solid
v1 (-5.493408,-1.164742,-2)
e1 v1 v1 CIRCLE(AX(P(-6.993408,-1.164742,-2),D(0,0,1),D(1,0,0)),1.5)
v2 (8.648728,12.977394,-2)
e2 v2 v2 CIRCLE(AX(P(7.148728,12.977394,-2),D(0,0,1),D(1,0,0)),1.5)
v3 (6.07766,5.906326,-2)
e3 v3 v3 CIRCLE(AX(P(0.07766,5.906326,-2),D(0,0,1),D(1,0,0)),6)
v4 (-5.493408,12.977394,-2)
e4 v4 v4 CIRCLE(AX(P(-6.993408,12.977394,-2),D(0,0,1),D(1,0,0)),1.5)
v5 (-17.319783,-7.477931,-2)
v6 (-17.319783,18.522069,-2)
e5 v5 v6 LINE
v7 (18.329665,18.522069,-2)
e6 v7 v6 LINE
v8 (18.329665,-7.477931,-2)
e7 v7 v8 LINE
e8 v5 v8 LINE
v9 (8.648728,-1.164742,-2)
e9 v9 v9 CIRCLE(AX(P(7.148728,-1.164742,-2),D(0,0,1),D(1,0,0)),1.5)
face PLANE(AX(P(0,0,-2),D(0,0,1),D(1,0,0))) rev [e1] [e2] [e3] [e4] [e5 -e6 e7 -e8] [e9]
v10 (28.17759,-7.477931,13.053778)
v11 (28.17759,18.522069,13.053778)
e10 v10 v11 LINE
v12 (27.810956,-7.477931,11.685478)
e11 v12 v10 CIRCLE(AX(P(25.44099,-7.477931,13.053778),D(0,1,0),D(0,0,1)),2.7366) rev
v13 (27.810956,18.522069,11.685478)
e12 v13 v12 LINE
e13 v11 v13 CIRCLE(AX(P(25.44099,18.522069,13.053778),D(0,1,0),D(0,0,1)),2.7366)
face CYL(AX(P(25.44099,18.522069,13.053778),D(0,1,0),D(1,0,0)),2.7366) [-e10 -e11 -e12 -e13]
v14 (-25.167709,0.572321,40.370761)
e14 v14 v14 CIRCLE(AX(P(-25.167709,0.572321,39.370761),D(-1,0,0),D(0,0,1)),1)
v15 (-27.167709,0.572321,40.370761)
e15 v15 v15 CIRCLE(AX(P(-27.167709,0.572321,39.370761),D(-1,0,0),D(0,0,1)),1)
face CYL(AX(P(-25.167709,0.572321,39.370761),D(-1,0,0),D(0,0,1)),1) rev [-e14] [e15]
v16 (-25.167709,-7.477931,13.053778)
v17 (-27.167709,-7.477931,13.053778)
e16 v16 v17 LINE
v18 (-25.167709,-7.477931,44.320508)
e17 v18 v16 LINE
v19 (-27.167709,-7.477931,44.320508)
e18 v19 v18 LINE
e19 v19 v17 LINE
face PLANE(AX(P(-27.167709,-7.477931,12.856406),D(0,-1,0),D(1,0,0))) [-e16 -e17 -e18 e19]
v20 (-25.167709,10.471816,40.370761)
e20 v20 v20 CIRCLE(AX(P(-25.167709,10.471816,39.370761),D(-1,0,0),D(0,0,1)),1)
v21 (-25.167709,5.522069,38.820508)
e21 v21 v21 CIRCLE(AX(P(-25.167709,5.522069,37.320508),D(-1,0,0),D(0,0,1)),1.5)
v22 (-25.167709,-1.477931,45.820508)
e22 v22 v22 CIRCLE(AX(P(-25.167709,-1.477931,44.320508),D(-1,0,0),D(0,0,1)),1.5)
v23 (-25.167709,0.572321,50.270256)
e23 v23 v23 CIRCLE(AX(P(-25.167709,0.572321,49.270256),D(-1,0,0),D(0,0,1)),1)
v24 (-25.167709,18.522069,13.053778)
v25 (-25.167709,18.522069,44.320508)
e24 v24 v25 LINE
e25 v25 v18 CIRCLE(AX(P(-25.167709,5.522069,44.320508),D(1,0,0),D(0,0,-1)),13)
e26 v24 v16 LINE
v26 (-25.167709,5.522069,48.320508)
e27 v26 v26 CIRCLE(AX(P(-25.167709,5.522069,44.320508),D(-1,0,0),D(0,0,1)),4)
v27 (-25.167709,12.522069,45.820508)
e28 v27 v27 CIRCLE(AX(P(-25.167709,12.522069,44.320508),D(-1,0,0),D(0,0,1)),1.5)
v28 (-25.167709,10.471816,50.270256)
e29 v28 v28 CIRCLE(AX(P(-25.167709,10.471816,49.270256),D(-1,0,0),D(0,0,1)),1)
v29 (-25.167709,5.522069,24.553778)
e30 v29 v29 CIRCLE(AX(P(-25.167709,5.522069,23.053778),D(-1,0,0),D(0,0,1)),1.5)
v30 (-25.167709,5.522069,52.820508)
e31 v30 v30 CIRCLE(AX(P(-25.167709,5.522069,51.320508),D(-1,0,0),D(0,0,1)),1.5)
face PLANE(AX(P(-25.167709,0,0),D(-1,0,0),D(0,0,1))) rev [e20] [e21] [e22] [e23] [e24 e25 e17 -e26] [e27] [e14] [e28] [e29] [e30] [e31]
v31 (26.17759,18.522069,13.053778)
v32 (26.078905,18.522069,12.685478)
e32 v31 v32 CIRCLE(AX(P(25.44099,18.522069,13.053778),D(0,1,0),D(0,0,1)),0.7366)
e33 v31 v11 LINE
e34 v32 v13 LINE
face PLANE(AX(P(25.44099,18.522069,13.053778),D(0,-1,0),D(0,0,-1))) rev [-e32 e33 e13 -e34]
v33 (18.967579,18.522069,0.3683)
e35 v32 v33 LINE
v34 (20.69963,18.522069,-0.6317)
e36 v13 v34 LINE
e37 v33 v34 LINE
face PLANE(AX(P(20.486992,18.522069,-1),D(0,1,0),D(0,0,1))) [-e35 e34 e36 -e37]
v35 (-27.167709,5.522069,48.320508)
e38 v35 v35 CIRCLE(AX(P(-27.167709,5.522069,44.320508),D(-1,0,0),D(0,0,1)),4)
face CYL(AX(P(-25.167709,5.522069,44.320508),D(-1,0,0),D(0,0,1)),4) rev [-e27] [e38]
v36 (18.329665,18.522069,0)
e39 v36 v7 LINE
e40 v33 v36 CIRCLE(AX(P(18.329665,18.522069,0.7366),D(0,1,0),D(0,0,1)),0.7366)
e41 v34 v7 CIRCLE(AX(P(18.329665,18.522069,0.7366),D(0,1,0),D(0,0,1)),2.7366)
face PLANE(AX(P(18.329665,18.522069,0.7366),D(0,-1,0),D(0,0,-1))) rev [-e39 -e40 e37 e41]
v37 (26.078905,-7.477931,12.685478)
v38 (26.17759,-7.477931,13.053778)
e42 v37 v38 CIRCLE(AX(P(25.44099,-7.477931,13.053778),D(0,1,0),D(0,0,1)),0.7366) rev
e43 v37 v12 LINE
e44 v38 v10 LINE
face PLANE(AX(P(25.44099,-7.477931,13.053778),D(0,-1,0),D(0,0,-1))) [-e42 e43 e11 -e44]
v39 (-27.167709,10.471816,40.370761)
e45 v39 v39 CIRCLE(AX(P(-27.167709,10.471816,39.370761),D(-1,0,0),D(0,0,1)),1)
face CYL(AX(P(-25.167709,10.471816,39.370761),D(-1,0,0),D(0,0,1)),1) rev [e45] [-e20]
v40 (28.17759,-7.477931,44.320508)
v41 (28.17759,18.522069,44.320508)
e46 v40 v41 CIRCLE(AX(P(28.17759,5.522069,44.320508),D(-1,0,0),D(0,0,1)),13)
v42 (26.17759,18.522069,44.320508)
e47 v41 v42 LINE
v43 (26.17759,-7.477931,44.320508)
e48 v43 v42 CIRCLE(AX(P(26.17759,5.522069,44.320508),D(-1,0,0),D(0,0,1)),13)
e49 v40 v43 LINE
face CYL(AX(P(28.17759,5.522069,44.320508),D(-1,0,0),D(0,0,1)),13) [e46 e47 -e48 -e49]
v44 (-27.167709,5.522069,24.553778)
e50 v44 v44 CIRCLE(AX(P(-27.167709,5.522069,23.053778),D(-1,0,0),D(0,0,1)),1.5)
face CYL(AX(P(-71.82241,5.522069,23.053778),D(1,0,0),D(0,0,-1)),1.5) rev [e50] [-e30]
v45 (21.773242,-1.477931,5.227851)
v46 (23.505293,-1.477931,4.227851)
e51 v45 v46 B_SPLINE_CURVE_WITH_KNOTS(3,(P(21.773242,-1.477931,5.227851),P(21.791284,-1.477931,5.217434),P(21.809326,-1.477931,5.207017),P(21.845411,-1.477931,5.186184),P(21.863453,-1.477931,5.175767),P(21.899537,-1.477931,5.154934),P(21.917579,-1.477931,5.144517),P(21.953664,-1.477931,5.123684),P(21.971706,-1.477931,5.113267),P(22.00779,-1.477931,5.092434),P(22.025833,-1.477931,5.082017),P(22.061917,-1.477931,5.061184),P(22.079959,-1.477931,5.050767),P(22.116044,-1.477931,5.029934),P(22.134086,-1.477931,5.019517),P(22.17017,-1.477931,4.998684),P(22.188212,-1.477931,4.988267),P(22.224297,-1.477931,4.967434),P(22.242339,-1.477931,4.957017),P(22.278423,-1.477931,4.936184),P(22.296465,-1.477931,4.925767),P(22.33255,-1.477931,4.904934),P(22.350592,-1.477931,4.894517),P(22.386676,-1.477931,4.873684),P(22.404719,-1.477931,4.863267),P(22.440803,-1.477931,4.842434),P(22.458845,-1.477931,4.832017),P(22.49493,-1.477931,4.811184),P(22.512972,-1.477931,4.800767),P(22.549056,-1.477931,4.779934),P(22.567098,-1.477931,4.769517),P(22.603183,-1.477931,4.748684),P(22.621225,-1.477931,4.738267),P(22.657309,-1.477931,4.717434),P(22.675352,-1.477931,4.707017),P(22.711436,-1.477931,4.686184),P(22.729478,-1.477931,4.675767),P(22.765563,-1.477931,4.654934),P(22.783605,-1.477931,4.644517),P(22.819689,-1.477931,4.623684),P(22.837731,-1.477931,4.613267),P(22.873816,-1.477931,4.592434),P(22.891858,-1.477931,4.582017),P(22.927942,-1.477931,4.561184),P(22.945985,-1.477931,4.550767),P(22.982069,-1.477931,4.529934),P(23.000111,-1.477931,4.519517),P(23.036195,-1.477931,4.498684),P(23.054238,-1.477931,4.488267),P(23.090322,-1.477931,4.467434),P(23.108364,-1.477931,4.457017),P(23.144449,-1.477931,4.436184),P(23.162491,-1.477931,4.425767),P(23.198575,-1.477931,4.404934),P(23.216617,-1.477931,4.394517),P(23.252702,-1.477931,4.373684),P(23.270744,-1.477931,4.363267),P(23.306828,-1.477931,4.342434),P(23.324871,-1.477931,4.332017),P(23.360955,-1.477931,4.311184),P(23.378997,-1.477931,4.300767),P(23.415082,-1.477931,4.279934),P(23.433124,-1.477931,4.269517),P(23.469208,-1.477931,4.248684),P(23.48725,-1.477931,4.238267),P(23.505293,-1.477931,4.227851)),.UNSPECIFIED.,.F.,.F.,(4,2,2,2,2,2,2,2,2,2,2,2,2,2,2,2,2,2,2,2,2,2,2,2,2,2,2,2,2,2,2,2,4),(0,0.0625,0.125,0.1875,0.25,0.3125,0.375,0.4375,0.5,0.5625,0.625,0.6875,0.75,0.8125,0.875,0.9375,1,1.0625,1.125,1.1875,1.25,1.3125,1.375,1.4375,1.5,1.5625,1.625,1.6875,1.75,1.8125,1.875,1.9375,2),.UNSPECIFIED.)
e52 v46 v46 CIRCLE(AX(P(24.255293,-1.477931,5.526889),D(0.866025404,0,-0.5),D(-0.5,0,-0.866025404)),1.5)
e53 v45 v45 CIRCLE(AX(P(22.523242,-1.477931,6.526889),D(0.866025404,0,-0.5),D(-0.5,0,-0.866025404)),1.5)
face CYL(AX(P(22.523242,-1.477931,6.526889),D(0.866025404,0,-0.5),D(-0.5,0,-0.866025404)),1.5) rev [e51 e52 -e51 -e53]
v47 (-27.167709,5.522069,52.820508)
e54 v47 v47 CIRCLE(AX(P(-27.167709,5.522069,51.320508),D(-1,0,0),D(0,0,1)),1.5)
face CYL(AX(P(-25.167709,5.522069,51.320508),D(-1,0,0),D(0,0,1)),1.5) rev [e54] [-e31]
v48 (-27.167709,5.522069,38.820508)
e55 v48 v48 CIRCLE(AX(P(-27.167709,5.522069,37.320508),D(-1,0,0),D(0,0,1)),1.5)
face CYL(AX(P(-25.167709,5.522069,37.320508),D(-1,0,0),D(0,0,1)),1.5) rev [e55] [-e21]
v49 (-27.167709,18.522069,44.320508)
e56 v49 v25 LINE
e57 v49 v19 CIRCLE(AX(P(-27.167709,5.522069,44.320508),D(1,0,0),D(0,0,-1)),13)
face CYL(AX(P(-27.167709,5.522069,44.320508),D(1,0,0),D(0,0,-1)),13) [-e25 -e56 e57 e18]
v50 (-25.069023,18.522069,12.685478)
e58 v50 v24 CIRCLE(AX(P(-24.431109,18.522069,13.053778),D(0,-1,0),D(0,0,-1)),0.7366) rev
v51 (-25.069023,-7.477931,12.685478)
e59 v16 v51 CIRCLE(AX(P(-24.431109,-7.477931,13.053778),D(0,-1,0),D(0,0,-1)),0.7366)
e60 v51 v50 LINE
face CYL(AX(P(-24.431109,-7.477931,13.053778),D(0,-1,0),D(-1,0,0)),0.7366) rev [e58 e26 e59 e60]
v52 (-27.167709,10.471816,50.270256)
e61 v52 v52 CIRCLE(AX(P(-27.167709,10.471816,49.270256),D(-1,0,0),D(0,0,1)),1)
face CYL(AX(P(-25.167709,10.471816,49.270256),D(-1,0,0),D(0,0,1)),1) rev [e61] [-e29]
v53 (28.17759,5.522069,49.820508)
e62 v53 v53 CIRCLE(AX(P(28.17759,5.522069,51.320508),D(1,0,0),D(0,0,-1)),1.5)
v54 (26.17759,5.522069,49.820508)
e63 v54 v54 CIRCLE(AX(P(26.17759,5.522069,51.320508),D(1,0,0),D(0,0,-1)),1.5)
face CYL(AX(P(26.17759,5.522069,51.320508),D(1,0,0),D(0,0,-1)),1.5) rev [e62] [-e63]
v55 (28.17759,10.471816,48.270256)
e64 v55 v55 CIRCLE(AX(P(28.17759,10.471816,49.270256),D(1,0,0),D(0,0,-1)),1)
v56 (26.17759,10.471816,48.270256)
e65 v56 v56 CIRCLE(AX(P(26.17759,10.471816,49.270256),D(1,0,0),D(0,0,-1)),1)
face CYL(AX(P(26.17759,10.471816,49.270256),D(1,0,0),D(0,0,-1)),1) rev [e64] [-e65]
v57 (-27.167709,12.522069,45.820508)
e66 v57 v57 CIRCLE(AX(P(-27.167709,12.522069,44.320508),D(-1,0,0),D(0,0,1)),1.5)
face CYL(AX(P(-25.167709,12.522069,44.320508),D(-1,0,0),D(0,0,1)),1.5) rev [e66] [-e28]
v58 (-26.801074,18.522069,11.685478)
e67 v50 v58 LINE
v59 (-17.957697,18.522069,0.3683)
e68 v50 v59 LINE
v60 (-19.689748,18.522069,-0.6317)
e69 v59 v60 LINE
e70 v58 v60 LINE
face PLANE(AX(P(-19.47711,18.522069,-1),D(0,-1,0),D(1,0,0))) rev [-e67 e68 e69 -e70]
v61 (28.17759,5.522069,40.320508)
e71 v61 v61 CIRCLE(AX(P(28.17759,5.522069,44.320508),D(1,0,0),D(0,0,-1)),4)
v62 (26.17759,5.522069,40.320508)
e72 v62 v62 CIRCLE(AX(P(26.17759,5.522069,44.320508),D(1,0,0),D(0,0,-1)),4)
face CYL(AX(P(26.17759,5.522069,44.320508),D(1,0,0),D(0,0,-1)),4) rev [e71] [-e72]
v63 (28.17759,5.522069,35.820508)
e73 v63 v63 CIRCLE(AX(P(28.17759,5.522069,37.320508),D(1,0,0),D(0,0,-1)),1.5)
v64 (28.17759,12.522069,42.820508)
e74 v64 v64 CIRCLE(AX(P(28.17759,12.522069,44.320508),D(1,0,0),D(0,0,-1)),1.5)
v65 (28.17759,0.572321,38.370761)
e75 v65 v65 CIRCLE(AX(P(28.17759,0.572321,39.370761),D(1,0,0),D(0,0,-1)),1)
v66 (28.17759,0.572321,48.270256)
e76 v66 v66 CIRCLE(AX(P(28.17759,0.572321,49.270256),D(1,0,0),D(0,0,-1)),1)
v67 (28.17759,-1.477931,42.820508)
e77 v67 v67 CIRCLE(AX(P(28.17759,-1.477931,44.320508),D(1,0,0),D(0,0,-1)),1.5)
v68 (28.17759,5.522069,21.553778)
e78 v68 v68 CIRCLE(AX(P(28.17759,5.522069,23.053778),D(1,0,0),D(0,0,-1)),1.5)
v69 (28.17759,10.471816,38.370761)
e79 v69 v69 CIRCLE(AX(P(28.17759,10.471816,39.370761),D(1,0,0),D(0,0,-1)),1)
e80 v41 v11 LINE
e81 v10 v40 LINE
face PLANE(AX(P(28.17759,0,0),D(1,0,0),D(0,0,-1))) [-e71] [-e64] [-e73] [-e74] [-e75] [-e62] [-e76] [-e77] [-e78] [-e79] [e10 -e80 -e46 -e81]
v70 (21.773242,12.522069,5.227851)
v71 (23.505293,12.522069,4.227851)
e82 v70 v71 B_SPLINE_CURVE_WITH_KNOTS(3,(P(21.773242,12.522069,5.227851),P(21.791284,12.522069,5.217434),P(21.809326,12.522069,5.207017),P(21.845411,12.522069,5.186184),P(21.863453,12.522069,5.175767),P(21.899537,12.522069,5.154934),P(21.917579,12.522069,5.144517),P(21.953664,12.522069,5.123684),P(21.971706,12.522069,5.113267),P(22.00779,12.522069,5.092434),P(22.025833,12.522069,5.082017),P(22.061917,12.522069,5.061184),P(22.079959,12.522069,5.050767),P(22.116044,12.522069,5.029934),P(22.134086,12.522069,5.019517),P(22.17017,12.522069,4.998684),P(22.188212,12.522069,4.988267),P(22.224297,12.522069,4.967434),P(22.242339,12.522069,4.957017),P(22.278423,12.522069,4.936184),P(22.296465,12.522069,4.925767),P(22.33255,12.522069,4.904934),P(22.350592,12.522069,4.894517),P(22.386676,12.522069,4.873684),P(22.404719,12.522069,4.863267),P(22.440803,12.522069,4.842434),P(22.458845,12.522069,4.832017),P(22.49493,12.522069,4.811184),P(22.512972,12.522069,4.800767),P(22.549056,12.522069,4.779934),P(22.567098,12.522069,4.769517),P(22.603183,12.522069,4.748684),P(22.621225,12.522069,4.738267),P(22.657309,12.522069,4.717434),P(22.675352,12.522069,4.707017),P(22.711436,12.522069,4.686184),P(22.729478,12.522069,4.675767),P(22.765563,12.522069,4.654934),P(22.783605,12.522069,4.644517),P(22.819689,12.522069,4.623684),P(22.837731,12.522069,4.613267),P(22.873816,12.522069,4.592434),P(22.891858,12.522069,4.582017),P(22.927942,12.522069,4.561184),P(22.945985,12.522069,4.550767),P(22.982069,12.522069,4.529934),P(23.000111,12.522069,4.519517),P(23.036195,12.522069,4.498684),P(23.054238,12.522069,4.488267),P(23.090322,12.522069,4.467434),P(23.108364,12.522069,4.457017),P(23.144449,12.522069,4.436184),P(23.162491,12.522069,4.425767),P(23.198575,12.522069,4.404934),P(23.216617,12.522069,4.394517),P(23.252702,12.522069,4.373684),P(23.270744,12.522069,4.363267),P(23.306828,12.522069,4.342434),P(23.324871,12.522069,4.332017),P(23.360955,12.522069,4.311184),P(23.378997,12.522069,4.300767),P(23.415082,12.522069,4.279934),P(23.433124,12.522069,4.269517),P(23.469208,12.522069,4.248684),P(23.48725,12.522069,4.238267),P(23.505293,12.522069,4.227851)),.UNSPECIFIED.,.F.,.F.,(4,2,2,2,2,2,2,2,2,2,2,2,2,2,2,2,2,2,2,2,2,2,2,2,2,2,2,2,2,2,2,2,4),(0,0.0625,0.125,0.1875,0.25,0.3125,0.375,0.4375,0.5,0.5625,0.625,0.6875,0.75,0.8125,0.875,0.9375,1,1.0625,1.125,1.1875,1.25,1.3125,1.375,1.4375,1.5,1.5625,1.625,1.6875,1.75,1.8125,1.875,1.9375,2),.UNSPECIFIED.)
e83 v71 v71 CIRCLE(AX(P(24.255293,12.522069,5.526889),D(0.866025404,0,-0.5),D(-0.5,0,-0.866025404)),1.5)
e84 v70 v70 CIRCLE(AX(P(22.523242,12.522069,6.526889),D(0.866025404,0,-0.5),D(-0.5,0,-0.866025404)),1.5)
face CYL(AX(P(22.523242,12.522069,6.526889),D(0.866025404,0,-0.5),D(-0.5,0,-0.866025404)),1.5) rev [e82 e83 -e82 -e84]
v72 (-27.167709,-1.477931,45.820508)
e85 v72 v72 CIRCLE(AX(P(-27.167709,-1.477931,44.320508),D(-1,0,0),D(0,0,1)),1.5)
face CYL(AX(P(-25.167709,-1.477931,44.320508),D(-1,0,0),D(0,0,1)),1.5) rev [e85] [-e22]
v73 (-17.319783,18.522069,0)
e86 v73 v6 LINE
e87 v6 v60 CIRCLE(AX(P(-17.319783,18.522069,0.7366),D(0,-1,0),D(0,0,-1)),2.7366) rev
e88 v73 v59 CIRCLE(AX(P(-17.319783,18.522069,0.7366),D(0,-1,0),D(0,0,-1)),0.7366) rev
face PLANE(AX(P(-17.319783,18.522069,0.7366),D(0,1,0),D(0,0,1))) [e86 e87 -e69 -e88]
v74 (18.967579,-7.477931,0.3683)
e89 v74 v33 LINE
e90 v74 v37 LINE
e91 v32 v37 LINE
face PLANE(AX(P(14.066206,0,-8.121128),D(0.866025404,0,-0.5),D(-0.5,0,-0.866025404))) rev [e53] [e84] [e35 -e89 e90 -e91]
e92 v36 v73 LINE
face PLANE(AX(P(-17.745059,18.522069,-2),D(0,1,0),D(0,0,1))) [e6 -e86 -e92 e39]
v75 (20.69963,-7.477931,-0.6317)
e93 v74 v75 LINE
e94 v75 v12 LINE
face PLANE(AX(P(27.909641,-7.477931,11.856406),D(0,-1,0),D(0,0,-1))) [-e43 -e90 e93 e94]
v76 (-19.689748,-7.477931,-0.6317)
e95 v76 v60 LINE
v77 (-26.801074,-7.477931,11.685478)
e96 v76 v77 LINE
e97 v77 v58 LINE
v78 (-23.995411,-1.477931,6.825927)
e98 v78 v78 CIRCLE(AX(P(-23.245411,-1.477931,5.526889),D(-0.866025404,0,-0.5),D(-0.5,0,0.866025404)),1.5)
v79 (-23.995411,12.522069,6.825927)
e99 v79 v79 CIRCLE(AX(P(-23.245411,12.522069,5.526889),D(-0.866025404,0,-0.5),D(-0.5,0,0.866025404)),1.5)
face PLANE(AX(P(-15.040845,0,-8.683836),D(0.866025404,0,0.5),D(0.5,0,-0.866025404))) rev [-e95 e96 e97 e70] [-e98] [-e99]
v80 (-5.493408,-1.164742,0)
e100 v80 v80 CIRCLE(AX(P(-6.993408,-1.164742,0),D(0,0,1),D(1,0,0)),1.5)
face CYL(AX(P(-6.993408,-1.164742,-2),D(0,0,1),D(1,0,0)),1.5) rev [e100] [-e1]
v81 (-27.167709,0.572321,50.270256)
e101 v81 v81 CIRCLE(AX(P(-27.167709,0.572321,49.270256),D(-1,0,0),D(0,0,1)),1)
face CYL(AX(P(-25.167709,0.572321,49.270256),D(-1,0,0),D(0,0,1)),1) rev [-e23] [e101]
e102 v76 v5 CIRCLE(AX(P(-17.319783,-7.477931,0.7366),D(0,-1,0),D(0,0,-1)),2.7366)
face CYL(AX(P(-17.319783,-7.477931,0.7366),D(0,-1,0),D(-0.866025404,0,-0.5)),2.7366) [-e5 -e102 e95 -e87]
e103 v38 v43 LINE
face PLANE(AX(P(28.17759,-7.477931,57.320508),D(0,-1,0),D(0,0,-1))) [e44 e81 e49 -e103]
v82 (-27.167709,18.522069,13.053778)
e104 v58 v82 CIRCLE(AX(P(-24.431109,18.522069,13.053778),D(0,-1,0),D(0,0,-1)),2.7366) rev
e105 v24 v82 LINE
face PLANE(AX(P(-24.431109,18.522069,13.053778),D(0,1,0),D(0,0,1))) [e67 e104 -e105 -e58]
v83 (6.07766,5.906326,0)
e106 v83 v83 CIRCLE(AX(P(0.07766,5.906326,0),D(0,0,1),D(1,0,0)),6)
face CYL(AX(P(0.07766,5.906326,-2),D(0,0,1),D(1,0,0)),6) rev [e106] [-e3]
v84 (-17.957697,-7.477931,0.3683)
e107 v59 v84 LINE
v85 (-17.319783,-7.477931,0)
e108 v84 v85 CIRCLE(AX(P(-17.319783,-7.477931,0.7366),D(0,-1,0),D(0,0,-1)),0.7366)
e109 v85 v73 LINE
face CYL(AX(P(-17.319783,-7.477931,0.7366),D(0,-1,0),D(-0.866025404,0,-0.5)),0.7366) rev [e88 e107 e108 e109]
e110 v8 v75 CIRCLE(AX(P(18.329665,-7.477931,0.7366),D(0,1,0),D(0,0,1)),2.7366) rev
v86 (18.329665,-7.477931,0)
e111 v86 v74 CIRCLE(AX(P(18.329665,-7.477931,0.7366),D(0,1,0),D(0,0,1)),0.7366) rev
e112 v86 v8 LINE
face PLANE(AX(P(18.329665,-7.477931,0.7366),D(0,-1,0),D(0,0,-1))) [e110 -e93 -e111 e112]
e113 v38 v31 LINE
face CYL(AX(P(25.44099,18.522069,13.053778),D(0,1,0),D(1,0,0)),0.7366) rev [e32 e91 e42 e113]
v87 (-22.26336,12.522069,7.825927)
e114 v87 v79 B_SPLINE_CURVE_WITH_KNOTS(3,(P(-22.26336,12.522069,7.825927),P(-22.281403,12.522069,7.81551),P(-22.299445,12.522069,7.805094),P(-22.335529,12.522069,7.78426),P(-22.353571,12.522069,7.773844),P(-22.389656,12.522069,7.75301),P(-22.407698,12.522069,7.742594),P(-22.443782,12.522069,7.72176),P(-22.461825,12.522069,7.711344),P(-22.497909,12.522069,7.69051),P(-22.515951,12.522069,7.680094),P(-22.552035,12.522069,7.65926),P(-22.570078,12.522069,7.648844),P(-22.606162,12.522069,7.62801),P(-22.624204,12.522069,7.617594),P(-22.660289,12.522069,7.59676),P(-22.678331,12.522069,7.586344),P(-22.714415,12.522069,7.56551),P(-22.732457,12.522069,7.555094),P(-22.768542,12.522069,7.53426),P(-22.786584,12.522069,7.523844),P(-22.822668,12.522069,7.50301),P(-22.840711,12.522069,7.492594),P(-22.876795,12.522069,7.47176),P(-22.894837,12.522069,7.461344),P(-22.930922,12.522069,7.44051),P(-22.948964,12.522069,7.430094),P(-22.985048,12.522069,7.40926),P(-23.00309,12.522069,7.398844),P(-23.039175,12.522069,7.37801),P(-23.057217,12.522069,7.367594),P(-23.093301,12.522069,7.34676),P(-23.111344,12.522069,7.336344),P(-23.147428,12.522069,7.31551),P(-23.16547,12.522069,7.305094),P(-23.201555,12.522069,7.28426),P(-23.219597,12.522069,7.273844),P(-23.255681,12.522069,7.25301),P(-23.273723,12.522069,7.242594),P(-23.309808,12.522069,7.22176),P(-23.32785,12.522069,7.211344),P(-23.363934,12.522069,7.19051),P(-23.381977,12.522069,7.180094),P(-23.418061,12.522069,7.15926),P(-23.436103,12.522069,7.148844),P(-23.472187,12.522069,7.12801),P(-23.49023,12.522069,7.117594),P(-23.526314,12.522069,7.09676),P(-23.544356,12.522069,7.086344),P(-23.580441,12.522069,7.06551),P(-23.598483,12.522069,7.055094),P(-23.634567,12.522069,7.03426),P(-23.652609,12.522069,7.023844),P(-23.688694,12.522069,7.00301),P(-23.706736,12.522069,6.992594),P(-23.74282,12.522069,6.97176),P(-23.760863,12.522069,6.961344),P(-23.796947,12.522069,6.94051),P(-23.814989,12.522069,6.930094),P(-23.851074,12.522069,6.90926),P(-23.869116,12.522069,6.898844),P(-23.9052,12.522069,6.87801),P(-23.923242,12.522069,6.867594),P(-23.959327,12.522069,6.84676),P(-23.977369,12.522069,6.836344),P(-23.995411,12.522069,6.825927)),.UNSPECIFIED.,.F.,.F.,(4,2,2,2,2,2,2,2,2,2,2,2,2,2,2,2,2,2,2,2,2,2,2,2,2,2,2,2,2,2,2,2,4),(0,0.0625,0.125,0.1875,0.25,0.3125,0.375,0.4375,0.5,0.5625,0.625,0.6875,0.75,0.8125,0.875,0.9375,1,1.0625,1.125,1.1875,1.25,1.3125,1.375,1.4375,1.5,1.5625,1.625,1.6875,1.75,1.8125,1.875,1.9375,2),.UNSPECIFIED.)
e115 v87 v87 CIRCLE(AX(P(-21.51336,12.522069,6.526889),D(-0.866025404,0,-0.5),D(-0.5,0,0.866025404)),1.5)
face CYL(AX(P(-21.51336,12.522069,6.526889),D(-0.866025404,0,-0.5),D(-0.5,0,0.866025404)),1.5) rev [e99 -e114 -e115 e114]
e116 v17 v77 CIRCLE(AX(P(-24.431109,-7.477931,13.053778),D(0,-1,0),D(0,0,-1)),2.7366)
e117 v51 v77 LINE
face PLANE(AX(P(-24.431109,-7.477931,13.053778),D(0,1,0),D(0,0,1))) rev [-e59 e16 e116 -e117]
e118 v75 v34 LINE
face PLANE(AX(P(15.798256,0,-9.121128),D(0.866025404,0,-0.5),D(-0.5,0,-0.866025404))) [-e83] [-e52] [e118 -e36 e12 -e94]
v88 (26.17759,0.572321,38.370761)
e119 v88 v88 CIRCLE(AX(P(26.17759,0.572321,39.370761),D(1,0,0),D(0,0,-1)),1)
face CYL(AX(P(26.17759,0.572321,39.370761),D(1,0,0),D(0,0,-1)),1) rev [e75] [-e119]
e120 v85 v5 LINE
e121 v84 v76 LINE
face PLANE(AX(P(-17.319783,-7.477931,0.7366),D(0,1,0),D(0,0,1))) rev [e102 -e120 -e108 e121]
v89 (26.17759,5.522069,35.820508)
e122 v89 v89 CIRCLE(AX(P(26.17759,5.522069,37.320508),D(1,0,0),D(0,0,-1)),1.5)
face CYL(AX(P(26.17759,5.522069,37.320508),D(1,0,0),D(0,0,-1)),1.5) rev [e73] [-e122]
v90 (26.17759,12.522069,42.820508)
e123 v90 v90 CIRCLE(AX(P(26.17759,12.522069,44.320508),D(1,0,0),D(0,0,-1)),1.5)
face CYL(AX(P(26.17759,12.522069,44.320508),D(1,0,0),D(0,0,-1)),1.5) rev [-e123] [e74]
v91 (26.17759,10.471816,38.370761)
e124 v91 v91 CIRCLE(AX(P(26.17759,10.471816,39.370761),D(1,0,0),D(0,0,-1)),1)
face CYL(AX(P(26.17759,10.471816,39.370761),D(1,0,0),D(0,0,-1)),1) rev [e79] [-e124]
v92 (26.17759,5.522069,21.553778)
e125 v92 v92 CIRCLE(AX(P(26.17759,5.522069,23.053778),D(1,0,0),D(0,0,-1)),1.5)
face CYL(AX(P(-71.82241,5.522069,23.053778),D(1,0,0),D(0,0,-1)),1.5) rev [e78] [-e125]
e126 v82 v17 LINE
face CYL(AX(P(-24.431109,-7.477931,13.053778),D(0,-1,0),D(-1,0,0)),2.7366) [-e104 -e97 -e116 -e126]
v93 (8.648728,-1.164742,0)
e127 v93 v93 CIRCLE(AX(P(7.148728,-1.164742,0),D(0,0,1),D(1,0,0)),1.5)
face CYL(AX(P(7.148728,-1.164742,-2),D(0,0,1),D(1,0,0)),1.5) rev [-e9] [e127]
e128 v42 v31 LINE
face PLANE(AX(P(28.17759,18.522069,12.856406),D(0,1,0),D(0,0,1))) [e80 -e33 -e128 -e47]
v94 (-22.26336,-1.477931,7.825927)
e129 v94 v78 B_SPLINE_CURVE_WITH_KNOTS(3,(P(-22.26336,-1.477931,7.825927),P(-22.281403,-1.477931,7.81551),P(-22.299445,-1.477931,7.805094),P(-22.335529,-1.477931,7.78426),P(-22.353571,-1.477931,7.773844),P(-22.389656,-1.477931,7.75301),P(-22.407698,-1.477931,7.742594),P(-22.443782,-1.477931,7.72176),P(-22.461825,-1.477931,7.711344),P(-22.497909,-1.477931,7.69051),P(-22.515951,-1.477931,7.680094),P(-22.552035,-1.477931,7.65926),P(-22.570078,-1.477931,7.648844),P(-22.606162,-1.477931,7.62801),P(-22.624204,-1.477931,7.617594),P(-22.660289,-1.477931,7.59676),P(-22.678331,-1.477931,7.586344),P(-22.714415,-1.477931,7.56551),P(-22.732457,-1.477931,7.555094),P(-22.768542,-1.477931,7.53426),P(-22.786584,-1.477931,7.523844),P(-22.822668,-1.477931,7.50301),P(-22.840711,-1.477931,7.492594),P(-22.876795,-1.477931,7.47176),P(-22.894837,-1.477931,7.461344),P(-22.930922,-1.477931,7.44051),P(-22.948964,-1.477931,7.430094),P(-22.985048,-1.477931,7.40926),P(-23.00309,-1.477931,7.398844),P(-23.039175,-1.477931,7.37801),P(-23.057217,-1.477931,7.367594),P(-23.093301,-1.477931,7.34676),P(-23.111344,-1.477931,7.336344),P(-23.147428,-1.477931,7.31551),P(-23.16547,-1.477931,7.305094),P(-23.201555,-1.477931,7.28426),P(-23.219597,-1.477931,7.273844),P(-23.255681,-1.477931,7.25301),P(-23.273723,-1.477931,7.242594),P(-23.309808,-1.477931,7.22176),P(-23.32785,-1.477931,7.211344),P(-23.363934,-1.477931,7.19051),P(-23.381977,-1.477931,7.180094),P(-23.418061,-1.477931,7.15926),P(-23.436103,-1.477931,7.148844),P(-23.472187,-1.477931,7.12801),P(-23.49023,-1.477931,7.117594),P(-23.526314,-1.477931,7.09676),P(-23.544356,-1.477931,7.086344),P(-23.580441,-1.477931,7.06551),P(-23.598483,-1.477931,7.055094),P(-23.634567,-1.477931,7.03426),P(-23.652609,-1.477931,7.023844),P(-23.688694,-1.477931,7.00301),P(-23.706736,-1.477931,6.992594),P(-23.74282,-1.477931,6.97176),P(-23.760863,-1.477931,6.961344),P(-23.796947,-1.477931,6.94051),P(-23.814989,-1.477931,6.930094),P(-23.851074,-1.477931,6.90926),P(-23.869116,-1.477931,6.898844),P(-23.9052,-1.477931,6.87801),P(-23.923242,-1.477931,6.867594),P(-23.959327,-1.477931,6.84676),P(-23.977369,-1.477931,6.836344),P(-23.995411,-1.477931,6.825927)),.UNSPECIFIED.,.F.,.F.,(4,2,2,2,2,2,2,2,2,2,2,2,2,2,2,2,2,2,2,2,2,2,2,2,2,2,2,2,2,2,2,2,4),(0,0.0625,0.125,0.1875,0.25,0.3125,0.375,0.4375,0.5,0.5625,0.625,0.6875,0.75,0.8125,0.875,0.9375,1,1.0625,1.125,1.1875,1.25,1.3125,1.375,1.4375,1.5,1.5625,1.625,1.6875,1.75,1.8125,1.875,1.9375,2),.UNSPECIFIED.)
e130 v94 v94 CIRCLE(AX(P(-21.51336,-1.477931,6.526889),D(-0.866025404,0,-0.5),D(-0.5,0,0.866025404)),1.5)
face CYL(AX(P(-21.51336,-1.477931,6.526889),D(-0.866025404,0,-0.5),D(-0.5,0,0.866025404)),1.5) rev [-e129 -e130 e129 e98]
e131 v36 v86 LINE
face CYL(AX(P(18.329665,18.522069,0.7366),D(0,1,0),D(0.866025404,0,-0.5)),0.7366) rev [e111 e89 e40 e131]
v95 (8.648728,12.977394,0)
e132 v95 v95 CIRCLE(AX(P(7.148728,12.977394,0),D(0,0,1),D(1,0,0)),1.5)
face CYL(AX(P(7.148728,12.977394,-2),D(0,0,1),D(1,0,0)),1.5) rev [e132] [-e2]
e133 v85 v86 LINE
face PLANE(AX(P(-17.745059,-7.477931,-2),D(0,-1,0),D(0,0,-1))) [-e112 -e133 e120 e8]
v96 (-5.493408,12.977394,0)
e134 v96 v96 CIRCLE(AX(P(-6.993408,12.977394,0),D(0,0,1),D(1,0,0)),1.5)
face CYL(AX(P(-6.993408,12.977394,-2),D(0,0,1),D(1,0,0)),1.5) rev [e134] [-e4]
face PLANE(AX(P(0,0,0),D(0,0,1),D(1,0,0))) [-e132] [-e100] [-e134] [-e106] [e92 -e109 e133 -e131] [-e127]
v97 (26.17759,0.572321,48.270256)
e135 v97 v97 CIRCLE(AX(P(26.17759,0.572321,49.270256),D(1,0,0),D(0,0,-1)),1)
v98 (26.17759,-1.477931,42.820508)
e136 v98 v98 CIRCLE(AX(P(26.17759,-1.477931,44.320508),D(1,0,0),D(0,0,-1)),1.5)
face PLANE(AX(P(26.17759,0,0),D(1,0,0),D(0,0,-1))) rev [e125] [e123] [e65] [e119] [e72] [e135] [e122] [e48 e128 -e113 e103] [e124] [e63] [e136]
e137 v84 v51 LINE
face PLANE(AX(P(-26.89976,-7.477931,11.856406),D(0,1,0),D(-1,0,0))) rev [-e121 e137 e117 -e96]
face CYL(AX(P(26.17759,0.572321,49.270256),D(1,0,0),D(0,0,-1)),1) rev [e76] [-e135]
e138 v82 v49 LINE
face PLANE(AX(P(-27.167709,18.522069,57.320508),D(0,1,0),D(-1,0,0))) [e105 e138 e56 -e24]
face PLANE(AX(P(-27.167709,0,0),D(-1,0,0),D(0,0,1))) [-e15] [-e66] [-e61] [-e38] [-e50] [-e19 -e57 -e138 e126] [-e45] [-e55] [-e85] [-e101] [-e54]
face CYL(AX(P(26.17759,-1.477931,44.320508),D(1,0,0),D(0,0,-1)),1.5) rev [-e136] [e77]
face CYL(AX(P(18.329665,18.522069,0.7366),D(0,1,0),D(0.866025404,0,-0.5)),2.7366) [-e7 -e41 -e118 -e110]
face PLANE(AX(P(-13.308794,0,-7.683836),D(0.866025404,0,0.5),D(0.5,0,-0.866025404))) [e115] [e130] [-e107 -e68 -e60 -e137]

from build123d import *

# Parameters (mm, degrees)
SKETCH_1_W                       = 36.5
SKETCH_1_H                       = 26
SM_BASE_FLANGE_1_DEPTH           = 2
SM_EDGE_FLANGE_1_STRIP_CUT_DEPTH = 26
SM_EDGE_FLANGE_1_DEPTH           = 26
SM_EDGE_FLANGE_2_STRIP_CUT_DEPTH = 26
SM_EDGE_FLANGE_2_DEPTH           = 26
SM_EDGE_FLANGE_3_STRIP_CUT_DEPTH = 26
SM_EDGE_FLANGE_3_DEPTH           = 26
SM_EDGE_FLANGE_4_STRIP_CUT_DEPTH = 26
SM_EDGE_FLANGE_4_DEPTH           = 26
CUT_EXTRUDE_1_DEPTH              = 2
CUT_EXTRUDE_START                = -2
CUT_EXTRUDE_2_DEPTH              = 2
SKETCH_28_R                      = 6
SKETCH_28_R_2                    = 1.5
CUT_EXTRUDE_3_DEPTH              = 2
SKETCH_33_R                      = 4
SKETCH_33_R_2                    = 1
SKETCH_33_R_3                    = 1.5
CUT_EXTRUDE_4_DEPTH              = 2
SKETCH_34_R                      = 1
SKETCH_34_R_2                    = 1.5
SKETCH_34_R_3                    = 4
CUT_EXTRUDE_5_DEPTH              = 2
SKETCH_35_R                      = 1.5
CUT_EXTRUDE_6_DEPTH              = 2
SKETCH_36_R                      = 1.5
CUT_EXTRUDE_7_DEPTH              = 2
SKETCH_37_R                      = 1.5
CUT_EXTRUDE_8_DEPTH              = 100


# Sheet-metal steps are written as plain solids
with BuildPart() as part:
    # Sketch 1 → 基体-法兰1 (new body)
    with BuildSketch(Plane.XY):
        with Locations((0.504940711, 5.522068511)):
            Rectangle(SKETCH_1_W, SKETCH_1_H)
    extrude(amount=-SM_BASE_FLANGE_1_DEPTH)

    # 边线-法兰1 strip (across the edge) → 边线-法兰1 strip cut (cut)
    with BuildSketch(Plane(origin=(18.754940711, -7.477931489, 0), x_dir=(-0.8660254037844364, 0, 0.5000000000000041), z_dir=(0, 1, 0))):
        Polygon((-8.835731855, 2.791911088), (-0.6317, -1.944688912), (0.3683, -0.212638104), (-7.835731855, 4.523961896), align=None)
    extrude(amount=SM_EDGE_FLANGE_1_STRIP_CUT_DEPTH, mode=Mode.SUBTRACT)

    # 边线-法兰1 section (across the edge) → 边线-法兰1 (add)
    with BuildSketch(Plane(origin=(18.754940711, -7.477931489, 0), x_dir=(-0.8660254037844364, 0, 0.5000000000000041), z_dir=(0, 1, 0))):
        with BuildLine():
            Line((-2, 0.425276208), (-2, 14.845299462))
            Line((-2, 14.845299462), (0, 14.845299462))
            Line((0, 14.845299462), (0, 0.425276208))
            ThreePointArc((0, 0.425276208), (0.098685688, 0.056976208), (0.3683, -0.212638104))
            Line((0.3683, -0.212638104), (-0.6317, -1.944688912))
            ThreePointArc((-0.6317, -1.944688912), (-1.63336512, -0.943023792), (-2, 0.425276208))
        make_face()
    extrude(amount=SM_EDGE_FLANGE_1_DEPTH)

    # 边线-法兰2 strip (across the edge) → 边线-法兰2 strip cut (cut)
    with BuildSketch(Plane(origin=(26.177590442, -7.477931489, 12.856406461), x_dir=(-1, 0, 0), z_dir=(0, 1, 0))):
        Polygon((-6.36996512, 7.03310323), (-1.63336512, -1.170928625), (0.098685688, -0.170928625), (-4.637914312, 8.03310323), align=None)
    extrude(amount=SM_EDGE_FLANGE_2_STRIP_CUT_DEPTH, mode=Mode.SUBTRACT)

    # 边线-法兰2 section (across the edge) → 边线-法兰2 (add)
    with BuildSketch(Plane(origin=(26.177590442, -7.477931489, 12.856406461), x_dir=(-1, 0, 0), z_dir=(0, 1, 0))):
        with BuildLine():
            Line((-2, 0.197371375), (-2, 44.464101615))
            Line((-2, 44.464101615), (0, 44.464101615))
            Line((0, 44.464101615), (0, 0.197371375))
            ThreePointArc((0, 0.197371375), (0.025099036, 0.006725267), (0.098685688, -0.170928625))
            Line((0.098685688, -0.170928625), (-1.63336512, -1.170928625))
            ThreePointArc((-1.63336512, -1.170928625), (-1.906752616, -0.510912824), (-2, 0.197371375))
        make_face()
    extrude(amount=SM_EDGE_FLANGE_2_DEPTH)

    # 边线-法兰3 strip (across the edge) → 边线-法兰3 strip cut (cut)
    with BuildSketch(Plane(origin=(-17.745059289, 18.522068511, 0), x_dir=(0.8660254037844365, 0, 0.500000000000004), z_dir=(0, -1, 0))):
        Polygon((-8.835731855, 2.791911088), (-0.6317, -1.944688912), (0.3683, -0.212638104), (-7.835731855, 4.523961896), align=None)
    extrude(amount=SM_EDGE_FLANGE_3_STRIP_CUT_DEPTH, mode=Mode.SUBTRACT)

    # 边线-法兰3 section (across the edge) → 边线-法兰3 (add)
    with BuildSketch(Plane(origin=(-17.745059289, 18.522068511, 0), x_dir=(0.8660254037844365, 0, 0.500000000000004), z_dir=(0, -1, 0))):
        with BuildLine():
            Line((-2, 0.425276208), (-2, 14.845299462))
            Line((-2, 14.845299462), (0, 14.845299462))
            Line((0, 14.845299462), (0, 0.425276208))
            ThreePointArc((0, 0.425276208), (0.098685688, 0.056976208), (0.3683, -0.212638104))
            Line((0.3683, -0.212638104), (-0.6317, -1.944688912))
            ThreePointArc((-0.6317, -1.944688912), (-1.63336512, -0.943023792), (-2, 0.425276208))
        make_face()
    extrude(amount=SM_EDGE_FLANGE_3_DEPTH)

    # 边线-法兰4 strip (across the edge) → 边线-法兰4 strip cut (cut)
    with BuildSketch(Plane(origin=(-25.167709019, 18.522068511, 12.856406461), x_dir=(1, 0, 0), z_dir=(0, -1, 0))):
        Polygon((-6.36996512, 7.03310323), (-1.63336512, -1.170928625), (0.098685688, -0.170928625), (-4.637914312, 8.03310323), align=None)
    extrude(amount=SM_EDGE_FLANGE_4_STRIP_CUT_DEPTH, mode=Mode.SUBTRACT)

    # 边线-法兰4 section (across the edge) → 边线-法兰4 (add)
    with BuildSketch(Plane(origin=(-25.167709019, 18.522068511, 12.856406461), x_dir=(1, 0, 0), z_dir=(0, -1, 0))):
        with BuildLine():
            Line((-2, 0.197371375), (-2, 44.464101615))
            Line((-2, 44.464101615), (0, 44.464101615))
            Line((0, 44.464101615), (0, 0.197371375))
            ThreePointArc((0, 0.197371375), (0.025099036, 0.006725267), (0.098685688, -0.170928625))
            Line((0.098685688, -0.170928625), (-1.63336512, -1.170928625))
            ThreePointArc((-1.63336512, -1.170928625), (-1.906752616, -0.510912824), (-2, 0.197371375))
        make_face()
    extrude(amount=SM_EDGE_FLANGE_4_DEPTH)

    # 草图20 → 切除-拉伸1 (cut)
    with BuildSketch(Plane.ZY.offset(-26.177590442)):
        with BuildLine():
            ThreePointArc((44.320508076, 18.522068511), (53.512896231, 14.714456667), (57.320508076, 5.522068511))
            Line((57.320508076, 5.522068511), (57.320508076, 18.522068511))
            Line((57.320508076, 18.522068511), (44.320508076, 18.522068511))
        make_face()
        with BuildLine():
            Line((57.320508076, -7.477931489), (57.320508076, 5.522068511))
            ThreePointArc((57.320508076, 5.522068511), (53.512896231, -3.670319644), (44.320508076, -7.477931489))
            Line((44.320508076, -7.477931489), (57.320508076, -7.477931489))
        make_face()
    extrude(amount=-CUT_EXTRUDE_1_DEPTH, mode=Mode.SUBTRACT)

    # 草图21 → 切除-拉伸2 (cut)
    with BuildSketch(Plane(origin=(-25.167709019, 0, 0), x_dir=(0, 0, -1), z_dir=(1, 0, 0)).offset(CUT_EXTRUDE_START)):
        with BuildLine():
            Line((-57.320508076, -7.477931489), (-44.320508076, -7.477931489))
            ThreePointArc((-44.320508076, -7.477931489), (-53.512896231, -3.670319644), (-57.320508076, 5.522068511))
            Line((-57.320508076, 5.522068511), (-57.320508076, -7.477931489))
        make_face()
        with BuildLine():
            ThreePointArc((-57.320508076, 5.522068511), (-53.512896231, 14.714456667), (-44.320508076, 18.522068511))
            Line((-44.320508076, 18.522068511), (-57.320508076, 18.522068511))
            Line((-57.320508076, 18.522068511), (-57.320508076, 5.522068511))
        make_face()
    extrude(amount=CUT_EXTRUDE_2_DEPTH, mode=Mode.SUBTRACT)

    # 草图28 → 切除-拉伸3 (cut)
    with BuildSketch(Plane.XY):
        with Locations((0.077660184, 5.906325961)):
            Circle(SKETCH_28_R)
        with Locations((7.148727996, 12.977393772)):
            Circle(SKETCH_28_R_2)
        with Locations((-6.993407628, -1.164741851)):
            Circle(SKETCH_28_R_2)
        with Locations((-6.993407628, 12.977393772)):
            Circle(SKETCH_28_R_2)
        with Locations((7.148727996, -1.164741851)):
            Circle(SKETCH_28_R_2)
    extrude(amount=-CUT_EXTRUDE_3_DEPTH, mode=Mode.SUBTRACT)

    # 草图33 → 切除-拉伸4 (cut)
    with BuildSketch(Plane(origin=(28.177590442, 0, 0), x_dir=(0, 0, -1), z_dir=(1, 0, 0))):
        with Locations((-44.320508076, 5.522068511)):
            Circle(SKETCH_33_R)
        with Locations((-39.370760607, 10.47181598)):
            Circle(SKETCH_33_R_2)
        with Locations((-39.370760607, 0.572321043)):
            Circle(SKETCH_33_R_2)
        with Locations((-49.270255544, 0.572321043)):
            Circle(SKETCH_33_R_2)
        with Locations((-49.270255544, 10.47181598)):
            Circle(SKETCH_33_R_2)
        with Locations((-44.320508076, 12.522068511)):
            Circle(SKETCH_33_R_3)
        with Locations((-37.320508076, 5.522068511)):
            Circle(SKETCH_33_R_3)
        with Locations((-44.320508076, -1.477931489)):
            Circle(SKETCH_33_R_3)
        with Locations((-51.320508076, 5.522068511)):
            Circle(SKETCH_33_R_3)
    extrude(amount=-CUT_EXTRUDE_4_DEPTH, mode=Mode.SUBTRACT)

    # 草图34 → 切除-拉伸5 (cut)
    with BuildSketch(Plane.ZY.offset(27.167709019).offset(CUT_EXTRUDE_START)):
        with Locations(Location((49.270255544, 10.47181598, 0), (0, 0, 180))):
            Circle(SKETCH_34_R)
        with Locations(Location((51.320508076, 5.522068511, 0), (0, 0, 180))):
            Circle(SKETCH_34_R_2)
        with Locations(Location((49.270255544, 0.572321043, 0), (0, 0, 180))):
            Circle(SKETCH_34_R)
        with Locations(Location((44.320508076, -1.477931489, 0), (0, 0, 180))):
            Circle(SKETCH_34_R_2)
        with Locations(Location((39.370760607, 0.572321043, 0), (0, 0, 180))):
            Circle(SKETCH_34_R)
        with Locations(Location((37.320508076, 5.522068511, 0), (0, 0, 180))):
            Circle(SKETCH_34_R_2)
        with Locations(Location((39.370760607, 10.47181598, 0), (0, 0, 180))):
            Circle(SKETCH_34_R)
        with Locations(Location((44.320508076, 12.522068511, 0), (0, 0, 180))):
            Circle(SKETCH_34_R_2)
        with Locations(Location((44.320508076, 5.522068511, 0), (0, 0, 180))):
            Circle(SKETCH_34_R_3)
    extrude(amount=CUT_EXTRUDE_5_DEPTH, mode=Mode.SUBTRACT)

    # 草图35 → 切除-拉伸6 (cut)
    with BuildSketch(Plane(origin=(15.798256341, 0, -9.121127551), x_dir=(-0.5000000000000041, 0, -0.8660254037844364), z_dir=(0.8660254037844363, 0, -0.500000000000004))):
        with Locations((-16.914072503, -1.477931489)):
            Circle(SKETCH_35_R)
        with Locations((-16.914072503, 12.522068511)):
            Circle(SKETCH_35_R)
    extrude(amount=-CUT_EXTRUDE_6_DEPTH, mode=Mode.SUBTRACT)

    # 草图36 → 切除-拉伸7 (cut)
    with BuildSketch(Plane(origin=(-15.040845274, 0, -8.683836068), x_dir=(-0.5000000000000041, 0, 0.8660254037844364), z_dir=(-0.8660254037844363, 0, -0.500000000000004))):
        with Locations((16.409131792, 12.522068511)):
            Circle(SKETCH_36_R)
        with Locations((16.409131792, -1.477931489)):
            Circle(SKETCH_36_R)
    extrude(amount=-CUT_EXTRUDE_7_DEPTH, mode=Mode.SUBTRACT)

    # 草图37 → 切除-拉伸8 (cut)
    with BuildSketch(Plane(origin=(28.177590442, 0, 0), x_dir=(0, 0, -1), z_dir=(1, 0, 0))):
        with Locations((-23.053777836, 5.522068511)):
            Circle(SKETCH_37_R)
    extrude(amount=-CUT_EXTRUDE_8_DEPTH, mode=Mode.SUBTRACT)


solid = part.part
